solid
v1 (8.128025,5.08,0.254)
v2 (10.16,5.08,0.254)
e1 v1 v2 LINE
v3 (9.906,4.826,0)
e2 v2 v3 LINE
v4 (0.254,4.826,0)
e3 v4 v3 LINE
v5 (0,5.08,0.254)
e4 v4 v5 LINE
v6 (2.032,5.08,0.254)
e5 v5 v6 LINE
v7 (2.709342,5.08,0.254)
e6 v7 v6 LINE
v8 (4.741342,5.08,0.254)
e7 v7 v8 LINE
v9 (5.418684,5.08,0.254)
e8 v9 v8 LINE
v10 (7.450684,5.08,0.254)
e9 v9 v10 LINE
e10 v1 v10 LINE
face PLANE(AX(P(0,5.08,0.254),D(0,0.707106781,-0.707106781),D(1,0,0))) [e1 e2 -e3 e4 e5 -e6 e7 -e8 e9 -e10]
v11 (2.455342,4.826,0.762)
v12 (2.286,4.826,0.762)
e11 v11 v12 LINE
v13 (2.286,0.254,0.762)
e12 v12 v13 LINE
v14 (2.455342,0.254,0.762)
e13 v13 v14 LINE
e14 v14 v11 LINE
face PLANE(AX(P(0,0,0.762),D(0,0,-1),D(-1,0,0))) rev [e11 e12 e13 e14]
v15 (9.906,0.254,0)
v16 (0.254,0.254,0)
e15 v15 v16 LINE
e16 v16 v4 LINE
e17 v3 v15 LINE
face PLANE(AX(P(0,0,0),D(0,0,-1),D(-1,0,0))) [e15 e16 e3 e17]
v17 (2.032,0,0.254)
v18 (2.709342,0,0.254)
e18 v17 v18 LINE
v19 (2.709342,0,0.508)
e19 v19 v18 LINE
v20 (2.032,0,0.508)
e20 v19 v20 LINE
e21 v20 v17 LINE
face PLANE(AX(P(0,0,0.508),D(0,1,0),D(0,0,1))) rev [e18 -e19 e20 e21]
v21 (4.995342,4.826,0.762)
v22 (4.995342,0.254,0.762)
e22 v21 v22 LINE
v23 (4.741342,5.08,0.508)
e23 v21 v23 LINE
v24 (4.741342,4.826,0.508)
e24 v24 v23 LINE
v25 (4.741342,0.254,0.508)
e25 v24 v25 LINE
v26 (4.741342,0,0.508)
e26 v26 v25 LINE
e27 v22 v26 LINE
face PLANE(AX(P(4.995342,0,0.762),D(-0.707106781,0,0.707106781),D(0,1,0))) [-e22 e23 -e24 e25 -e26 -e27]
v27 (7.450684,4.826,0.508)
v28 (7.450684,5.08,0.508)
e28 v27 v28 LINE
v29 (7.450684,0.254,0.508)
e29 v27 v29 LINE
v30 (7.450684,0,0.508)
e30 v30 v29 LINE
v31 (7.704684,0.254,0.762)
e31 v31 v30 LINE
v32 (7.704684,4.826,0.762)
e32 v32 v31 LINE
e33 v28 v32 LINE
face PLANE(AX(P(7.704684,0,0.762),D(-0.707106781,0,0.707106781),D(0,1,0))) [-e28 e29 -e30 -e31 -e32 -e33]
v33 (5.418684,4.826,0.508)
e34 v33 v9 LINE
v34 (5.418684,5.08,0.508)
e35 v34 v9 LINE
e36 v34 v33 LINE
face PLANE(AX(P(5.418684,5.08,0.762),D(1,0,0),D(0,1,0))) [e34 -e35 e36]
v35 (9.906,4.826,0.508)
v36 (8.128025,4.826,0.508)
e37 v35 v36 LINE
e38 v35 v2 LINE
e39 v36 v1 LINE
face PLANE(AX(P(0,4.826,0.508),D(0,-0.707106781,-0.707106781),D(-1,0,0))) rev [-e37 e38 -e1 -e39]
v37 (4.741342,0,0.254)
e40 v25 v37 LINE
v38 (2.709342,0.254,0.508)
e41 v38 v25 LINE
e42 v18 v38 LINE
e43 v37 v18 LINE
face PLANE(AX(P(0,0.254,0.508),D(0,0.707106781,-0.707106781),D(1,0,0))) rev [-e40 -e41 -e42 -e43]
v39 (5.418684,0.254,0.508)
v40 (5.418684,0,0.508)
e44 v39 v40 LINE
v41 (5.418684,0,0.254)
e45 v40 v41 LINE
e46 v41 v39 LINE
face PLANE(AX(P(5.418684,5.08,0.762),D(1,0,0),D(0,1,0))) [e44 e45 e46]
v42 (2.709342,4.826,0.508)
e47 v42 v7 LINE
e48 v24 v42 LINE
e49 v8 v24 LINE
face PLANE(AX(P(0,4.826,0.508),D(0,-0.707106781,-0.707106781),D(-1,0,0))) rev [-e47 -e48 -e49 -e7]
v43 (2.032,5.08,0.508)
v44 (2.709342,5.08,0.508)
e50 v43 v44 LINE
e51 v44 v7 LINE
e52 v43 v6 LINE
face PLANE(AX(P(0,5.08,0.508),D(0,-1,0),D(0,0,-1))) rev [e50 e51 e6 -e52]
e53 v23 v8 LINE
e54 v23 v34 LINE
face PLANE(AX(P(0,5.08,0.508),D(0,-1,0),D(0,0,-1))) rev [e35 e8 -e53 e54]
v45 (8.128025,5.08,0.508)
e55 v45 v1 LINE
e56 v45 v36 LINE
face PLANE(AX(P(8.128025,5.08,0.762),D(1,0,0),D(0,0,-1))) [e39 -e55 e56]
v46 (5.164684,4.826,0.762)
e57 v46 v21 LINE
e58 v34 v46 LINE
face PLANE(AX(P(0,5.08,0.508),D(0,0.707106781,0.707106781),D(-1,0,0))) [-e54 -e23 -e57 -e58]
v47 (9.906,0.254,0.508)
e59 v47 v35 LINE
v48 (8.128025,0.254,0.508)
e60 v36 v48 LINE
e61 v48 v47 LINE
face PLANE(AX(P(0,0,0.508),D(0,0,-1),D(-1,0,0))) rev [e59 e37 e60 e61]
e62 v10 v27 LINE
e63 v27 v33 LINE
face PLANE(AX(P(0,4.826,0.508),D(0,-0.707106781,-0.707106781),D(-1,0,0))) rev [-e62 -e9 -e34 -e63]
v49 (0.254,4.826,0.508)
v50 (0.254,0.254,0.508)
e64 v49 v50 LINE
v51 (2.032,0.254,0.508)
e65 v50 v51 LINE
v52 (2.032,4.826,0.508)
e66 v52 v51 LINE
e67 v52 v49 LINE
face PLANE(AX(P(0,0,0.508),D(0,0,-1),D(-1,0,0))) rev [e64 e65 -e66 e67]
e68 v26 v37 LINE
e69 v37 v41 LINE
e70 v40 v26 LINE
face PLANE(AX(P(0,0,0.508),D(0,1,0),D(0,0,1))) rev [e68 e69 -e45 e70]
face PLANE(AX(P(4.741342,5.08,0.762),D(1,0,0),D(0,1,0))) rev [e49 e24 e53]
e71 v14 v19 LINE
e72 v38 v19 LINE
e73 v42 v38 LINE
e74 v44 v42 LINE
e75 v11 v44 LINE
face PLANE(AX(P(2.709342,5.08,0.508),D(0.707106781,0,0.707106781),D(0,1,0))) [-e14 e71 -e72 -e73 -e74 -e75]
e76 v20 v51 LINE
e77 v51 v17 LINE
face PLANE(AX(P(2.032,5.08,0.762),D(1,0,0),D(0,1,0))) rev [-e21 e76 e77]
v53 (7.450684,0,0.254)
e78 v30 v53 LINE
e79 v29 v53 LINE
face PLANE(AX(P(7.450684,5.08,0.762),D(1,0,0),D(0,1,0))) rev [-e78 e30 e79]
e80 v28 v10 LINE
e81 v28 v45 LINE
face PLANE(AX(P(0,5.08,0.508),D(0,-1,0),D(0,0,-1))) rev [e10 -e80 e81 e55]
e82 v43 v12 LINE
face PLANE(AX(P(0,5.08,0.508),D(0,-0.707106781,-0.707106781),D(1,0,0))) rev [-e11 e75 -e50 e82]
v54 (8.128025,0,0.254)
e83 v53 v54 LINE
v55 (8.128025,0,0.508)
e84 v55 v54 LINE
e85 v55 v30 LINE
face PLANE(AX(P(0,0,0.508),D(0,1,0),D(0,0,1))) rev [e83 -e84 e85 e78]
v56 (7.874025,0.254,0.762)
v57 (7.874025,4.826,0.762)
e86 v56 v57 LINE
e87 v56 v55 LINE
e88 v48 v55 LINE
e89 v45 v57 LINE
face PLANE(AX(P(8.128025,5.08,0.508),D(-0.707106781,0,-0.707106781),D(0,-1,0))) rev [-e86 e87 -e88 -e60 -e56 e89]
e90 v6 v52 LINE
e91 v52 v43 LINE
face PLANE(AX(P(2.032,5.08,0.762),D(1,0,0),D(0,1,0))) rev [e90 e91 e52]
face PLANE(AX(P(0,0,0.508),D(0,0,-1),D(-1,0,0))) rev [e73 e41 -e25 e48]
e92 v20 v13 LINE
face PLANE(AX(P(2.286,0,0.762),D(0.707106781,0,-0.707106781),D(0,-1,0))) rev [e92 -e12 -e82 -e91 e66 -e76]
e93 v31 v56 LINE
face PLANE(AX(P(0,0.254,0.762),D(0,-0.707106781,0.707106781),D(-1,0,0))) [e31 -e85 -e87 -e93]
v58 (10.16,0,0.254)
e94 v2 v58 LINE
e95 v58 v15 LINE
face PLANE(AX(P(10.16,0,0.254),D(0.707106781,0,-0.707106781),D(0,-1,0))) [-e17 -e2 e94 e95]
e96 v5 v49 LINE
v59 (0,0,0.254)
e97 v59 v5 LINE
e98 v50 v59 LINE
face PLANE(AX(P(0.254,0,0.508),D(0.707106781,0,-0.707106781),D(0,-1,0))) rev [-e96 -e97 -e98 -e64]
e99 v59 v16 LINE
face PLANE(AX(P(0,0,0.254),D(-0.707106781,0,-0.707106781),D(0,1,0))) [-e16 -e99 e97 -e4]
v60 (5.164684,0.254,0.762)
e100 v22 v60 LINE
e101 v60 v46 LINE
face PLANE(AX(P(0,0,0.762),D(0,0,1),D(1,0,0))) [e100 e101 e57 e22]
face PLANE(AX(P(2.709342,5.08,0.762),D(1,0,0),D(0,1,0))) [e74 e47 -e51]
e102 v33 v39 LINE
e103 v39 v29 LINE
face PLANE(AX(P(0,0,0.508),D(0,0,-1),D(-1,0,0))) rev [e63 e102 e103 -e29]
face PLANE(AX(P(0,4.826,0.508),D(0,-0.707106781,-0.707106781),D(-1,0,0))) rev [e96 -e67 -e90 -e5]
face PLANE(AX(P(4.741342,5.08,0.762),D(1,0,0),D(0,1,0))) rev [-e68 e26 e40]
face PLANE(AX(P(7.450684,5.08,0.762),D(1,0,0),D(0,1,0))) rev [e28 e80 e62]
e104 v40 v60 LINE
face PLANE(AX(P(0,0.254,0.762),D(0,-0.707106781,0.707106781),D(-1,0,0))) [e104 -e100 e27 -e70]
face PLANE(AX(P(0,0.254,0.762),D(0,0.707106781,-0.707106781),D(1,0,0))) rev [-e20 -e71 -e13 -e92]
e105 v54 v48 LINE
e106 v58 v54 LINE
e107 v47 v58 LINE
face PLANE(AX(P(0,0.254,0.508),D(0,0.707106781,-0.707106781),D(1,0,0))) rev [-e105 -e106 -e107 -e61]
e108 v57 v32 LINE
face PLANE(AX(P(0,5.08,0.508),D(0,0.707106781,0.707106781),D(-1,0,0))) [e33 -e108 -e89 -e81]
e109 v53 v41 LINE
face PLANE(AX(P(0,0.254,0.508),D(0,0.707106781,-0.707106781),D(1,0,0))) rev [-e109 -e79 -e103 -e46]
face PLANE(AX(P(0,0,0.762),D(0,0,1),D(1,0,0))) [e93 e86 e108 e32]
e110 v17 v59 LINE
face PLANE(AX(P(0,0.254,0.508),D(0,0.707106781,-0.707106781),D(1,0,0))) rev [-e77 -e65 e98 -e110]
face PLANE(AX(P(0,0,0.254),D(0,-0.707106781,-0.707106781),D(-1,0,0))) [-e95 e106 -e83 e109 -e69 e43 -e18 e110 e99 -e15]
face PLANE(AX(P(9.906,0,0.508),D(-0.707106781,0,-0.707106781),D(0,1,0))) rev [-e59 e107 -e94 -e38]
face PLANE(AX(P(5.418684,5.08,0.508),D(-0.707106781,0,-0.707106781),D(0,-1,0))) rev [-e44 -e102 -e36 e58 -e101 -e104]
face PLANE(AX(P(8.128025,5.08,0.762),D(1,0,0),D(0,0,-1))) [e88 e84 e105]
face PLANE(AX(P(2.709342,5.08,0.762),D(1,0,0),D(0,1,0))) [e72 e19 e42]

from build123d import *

# Parameters (mm, degrees)
SKETCH1_W           = 10.16
SKETCH1_H           = 5.08
BOSS_EXTRUDE1_DEPTH = 0.508
SKETCH2_W           = 0.6773418
SKETCH2_H           = 5.08
BOSS_EXTRUDE2_DEPTH = 0.254
CHAMFER3_SIZE       = 0.254
CHAMFER4_SIZE       = 0.254
CHAMFER5_SIZE       = 0.254


with BuildPart() as part:
    # Sketch1 → Boss-Extrude1 (new body)
    with BuildSketch(Plane.XY):
        with Locations((5.08, 2.54)):
            Rectangle(SKETCH1_W, SKETCH1_H)
    extrude(amount=BOSS_EXTRUDE1_DEPTH)

    # Sketch2 → Boss-Extrude2 (add)
    with BuildSketch(Plane.XY.offset(0.508)):
        with Locations((2.3706709, 2.54)):
            Rectangle(SKETCH2_W, SKETCH2_H)
        with Locations((5.0800127, 2.54)):
            Rectangle(SKETCH2_W, SKETCH2_H)
        with Locations((7.7893545, 2.54)):
            Rectangle(SKETCH2_W, SKETCH2_H)
    extrude(amount=BOSS_EXTRUDE2_DEPTH)

    # Chamfer3
    chamfer3_edges = [part.edges().sort_by_distance(p)[0] for p in [
        (5.08, 5.08, 0),
        (10.16, 2.54, 0),
        (5.08, 0, 0),
        (1.016, 0, 0.508),
        (3.7253418, 0, 0.508),
        (6.4346836, 0, 0.508),
        (9.1440127, 0, 0.508),
        (10.16, 2.54, 0.508),
        (9.1440127, 5.08, 0.508),
        (6.4346836, 5.08, 0.508),
        (3.7253418, 5.08, 0.508),
        (1.016, 5.08, 0.508),
    ]]
    chamfer(chamfer3_edges, length=CHAMFER3_SIZE - 0.0001)  # a hair under: the kernel refuses the full size

    # Chamfer4
    chamfer4_edges = [part.edges().sort_by_distance(p)[0] for p in [
        (0, 2.54, 0),
        (0, 2.54, 0.508),
    ]]
    chamfer(chamfer4_edges, length=CHAMFER4_SIZE - 0.0001)  # a hair under: the kernel refuses the full size

    # Chamfer5
    chamfer5_edges = [part.edges().sort_by_distance(p)[0] for p in [
        (2.3706709, 5.08, 0.762),
        (2.7093418, 2.54, 0.762),
        (2.032, 2.54, 0.762),
        (2.3706709, 0, 0.762),
        (5.4186836, 2.54, 0.762),
        (5.0800127, 5.08, 0.762),
        (4.7413418, 2.54, 0.762),
        (5.0800127, 0, 0.762),
        (8.1280254, 2.54, 0.762),
        (7.7893545, 5.08, 0.762),
        (7.4506836, 2.54, 0.762),
        (7.7893545, 0, 0.762),
    ]]
    chamfer(chamfer5_edges, length=CHAMFER5_SIZE - 0.0001)  # a hair under: the kernel refuses the full size


solid = part.part
